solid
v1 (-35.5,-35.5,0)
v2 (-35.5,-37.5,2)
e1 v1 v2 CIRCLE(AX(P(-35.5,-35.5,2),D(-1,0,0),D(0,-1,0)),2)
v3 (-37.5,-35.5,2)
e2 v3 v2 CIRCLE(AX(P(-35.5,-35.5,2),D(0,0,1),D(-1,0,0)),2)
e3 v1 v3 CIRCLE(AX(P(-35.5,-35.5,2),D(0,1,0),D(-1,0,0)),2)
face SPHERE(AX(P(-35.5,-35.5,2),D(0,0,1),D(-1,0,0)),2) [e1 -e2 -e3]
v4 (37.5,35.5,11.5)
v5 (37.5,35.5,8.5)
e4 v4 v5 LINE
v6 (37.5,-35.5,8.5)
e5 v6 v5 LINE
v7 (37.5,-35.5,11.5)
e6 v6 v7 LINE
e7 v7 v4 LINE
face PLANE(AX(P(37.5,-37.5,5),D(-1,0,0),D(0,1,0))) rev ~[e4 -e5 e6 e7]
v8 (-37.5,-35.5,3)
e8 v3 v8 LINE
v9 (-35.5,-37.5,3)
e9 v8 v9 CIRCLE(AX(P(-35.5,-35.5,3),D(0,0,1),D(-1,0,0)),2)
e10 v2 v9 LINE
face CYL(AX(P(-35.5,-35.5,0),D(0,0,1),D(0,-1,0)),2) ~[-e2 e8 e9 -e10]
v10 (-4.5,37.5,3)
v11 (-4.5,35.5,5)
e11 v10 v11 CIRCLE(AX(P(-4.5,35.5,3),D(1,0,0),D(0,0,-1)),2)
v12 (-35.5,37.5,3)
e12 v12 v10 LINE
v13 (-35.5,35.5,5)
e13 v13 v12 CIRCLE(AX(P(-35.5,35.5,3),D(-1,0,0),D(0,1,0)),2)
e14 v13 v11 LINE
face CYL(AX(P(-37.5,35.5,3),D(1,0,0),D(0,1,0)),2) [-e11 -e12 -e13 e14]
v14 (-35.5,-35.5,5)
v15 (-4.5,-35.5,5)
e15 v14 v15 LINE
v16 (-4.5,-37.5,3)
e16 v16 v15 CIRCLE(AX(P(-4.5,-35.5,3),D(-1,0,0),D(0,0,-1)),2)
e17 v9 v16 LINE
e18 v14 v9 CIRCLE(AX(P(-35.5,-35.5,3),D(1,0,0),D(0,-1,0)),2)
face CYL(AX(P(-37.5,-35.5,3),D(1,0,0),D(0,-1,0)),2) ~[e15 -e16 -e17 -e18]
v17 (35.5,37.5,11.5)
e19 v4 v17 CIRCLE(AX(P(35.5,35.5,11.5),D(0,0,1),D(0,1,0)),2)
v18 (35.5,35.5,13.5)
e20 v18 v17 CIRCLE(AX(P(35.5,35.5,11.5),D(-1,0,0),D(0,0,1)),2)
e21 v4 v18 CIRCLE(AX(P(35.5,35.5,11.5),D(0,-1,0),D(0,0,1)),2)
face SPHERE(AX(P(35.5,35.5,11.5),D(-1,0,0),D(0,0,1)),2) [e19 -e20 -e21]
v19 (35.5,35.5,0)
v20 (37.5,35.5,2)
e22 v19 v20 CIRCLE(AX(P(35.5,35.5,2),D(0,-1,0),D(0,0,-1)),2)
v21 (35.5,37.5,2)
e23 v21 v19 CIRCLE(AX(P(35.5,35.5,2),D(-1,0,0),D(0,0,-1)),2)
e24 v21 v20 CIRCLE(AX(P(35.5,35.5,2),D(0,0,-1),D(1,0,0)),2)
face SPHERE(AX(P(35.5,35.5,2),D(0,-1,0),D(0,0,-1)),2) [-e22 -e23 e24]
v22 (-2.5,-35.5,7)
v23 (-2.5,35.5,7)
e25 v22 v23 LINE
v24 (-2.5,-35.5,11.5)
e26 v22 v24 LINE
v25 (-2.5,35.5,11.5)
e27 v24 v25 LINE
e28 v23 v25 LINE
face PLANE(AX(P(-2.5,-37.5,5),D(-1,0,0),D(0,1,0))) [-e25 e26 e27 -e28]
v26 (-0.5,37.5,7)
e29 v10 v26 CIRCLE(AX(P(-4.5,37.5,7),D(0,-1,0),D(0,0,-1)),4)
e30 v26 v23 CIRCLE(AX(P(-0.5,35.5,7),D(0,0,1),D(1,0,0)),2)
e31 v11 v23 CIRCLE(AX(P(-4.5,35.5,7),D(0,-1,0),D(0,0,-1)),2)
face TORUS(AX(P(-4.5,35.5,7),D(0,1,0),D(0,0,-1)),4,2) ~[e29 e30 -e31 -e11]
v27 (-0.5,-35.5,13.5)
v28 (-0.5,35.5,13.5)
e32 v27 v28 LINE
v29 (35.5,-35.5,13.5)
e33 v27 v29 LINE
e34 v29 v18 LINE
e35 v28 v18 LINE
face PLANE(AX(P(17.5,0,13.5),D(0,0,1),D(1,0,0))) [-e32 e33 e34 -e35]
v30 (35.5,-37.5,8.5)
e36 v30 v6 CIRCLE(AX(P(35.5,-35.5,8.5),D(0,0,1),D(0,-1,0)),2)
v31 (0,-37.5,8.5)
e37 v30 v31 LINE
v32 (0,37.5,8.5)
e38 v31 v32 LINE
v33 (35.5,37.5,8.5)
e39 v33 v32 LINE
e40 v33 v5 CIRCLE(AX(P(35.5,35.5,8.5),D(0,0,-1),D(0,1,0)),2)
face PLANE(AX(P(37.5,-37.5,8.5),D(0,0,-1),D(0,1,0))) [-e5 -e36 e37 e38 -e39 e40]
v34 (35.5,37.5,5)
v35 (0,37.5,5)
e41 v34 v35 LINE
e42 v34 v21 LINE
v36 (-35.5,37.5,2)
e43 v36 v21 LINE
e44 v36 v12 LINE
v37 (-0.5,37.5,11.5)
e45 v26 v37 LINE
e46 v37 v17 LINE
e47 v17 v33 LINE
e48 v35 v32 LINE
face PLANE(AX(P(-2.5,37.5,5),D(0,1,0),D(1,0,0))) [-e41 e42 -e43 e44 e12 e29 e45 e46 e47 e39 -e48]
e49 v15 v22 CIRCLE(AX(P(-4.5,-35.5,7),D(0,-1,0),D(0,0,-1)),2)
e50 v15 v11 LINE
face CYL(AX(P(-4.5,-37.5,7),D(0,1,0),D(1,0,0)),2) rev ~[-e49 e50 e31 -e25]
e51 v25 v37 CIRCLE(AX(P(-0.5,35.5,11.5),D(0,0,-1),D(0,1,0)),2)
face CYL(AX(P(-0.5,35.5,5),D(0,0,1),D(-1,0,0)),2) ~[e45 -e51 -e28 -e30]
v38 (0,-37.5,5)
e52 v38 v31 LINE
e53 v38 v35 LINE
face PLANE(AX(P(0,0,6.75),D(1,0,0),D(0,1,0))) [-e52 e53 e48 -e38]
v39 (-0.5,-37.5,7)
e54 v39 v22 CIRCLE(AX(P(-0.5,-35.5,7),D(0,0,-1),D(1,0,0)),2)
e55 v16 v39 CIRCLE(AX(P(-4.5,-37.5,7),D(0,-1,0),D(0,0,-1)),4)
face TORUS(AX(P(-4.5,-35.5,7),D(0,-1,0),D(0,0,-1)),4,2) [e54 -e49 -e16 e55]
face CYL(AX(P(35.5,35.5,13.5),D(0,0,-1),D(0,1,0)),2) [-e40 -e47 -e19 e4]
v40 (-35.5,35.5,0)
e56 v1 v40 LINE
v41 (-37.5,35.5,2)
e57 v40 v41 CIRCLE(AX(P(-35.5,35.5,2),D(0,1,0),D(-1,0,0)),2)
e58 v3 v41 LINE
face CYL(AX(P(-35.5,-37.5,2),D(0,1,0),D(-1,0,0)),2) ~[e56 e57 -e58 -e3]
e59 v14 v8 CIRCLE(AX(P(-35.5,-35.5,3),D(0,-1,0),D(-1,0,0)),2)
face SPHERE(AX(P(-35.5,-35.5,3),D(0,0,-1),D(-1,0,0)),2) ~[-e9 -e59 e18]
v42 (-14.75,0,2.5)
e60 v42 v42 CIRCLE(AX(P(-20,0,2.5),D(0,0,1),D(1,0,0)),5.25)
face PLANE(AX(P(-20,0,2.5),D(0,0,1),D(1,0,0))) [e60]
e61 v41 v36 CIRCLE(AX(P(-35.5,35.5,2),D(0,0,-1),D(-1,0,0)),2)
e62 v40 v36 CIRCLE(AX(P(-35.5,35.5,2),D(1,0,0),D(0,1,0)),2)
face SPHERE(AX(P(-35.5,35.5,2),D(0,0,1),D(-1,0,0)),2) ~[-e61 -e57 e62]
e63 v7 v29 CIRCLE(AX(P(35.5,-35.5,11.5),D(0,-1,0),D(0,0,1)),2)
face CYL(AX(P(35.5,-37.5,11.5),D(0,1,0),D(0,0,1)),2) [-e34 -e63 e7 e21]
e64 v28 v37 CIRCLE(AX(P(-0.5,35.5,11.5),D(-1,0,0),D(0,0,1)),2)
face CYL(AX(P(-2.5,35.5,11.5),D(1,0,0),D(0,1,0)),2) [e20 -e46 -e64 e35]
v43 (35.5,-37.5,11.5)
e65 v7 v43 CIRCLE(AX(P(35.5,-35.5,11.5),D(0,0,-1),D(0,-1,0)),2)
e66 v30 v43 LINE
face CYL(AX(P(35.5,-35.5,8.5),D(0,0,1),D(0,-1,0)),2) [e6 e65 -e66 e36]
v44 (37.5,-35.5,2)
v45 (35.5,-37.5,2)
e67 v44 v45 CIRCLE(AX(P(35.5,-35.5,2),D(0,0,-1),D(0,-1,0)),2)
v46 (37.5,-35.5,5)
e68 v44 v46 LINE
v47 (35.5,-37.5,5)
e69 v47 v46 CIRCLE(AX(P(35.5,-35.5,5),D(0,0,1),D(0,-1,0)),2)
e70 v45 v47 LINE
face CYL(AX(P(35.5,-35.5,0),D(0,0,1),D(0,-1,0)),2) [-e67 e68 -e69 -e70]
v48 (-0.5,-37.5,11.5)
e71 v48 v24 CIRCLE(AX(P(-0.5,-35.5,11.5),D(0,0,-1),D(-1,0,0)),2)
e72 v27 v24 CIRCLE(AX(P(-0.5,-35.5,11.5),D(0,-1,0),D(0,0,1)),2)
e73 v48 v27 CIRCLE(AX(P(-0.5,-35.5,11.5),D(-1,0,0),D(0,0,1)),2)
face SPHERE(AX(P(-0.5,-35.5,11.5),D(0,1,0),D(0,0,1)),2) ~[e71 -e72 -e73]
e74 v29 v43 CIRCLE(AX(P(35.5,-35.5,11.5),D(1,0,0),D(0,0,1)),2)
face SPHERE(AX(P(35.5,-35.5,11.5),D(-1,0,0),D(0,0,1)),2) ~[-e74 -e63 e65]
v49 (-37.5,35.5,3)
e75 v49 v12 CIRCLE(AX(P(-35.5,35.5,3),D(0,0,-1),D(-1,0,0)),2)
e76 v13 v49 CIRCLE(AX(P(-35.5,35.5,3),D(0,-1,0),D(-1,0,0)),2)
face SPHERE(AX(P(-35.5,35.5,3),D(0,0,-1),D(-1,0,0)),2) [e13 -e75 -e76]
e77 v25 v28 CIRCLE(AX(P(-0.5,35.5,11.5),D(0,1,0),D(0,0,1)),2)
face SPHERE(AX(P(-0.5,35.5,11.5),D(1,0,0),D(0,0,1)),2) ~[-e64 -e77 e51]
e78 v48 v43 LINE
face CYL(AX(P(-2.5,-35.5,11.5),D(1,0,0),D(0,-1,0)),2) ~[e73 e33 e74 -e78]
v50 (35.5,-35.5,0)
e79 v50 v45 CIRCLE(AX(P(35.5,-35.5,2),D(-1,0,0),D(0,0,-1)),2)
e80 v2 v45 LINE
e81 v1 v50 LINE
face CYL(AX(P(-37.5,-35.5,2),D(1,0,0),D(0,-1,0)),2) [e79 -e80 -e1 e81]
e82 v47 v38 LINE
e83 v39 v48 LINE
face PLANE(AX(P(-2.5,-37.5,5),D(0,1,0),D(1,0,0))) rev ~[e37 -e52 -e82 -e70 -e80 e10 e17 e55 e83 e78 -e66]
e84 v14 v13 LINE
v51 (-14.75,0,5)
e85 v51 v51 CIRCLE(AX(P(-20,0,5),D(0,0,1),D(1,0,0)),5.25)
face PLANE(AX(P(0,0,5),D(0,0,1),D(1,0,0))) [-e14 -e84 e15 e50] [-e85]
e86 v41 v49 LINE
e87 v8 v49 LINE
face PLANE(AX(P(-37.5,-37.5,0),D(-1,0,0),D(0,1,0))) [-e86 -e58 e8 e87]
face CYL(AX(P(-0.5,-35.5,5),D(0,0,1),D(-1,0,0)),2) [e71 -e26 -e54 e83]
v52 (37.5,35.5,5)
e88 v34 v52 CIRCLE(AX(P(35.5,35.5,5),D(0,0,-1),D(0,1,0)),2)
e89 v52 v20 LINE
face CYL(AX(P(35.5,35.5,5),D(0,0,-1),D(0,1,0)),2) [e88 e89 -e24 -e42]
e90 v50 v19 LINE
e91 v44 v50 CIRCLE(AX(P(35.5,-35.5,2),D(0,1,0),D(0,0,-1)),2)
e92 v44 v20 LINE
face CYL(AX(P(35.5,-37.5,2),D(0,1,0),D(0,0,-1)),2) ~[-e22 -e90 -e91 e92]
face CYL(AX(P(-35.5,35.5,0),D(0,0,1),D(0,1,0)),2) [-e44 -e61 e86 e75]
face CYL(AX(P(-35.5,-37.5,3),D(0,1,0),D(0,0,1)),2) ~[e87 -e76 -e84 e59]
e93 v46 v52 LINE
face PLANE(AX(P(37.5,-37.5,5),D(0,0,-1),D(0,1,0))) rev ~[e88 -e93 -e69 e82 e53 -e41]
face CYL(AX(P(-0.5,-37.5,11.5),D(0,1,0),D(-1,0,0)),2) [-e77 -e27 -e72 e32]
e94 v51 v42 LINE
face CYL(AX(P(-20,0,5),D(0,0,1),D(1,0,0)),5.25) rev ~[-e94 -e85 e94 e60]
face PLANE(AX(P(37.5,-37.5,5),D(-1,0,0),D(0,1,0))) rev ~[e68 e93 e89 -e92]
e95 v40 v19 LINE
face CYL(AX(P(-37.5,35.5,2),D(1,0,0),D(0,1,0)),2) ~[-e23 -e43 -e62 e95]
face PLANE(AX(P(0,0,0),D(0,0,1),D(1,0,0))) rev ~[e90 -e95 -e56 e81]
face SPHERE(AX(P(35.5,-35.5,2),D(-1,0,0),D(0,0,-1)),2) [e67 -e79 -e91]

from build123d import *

# Parameters (mm, degrees)
F0_W     = 75
F0_H     = 75
F1_DEPTH = 5
F2_W     = 40
F2_H     = 75
F3_DEPTH = 8.5
F4_W     = 75
F4_H     = 3.5
F5_DEPTH = 37.5
F6_R     = 5.25
F7_DEPTH = 2.5
F8_R     = 2


with BuildPart() as f1:
    # F0 (on Top) → F1 (new body)
    with BuildSketch(Plane.XY):
        Rectangle(F0_W, F0_H)
    extrude(amount=F1_DEPTH)

    # F2 (on face) → F3 (join)
    with BuildSketch(Plane.XY.offset(5)):
        with Locations((17.5, 0)):
            Rectangle(F2_W, F2_H)
    extrude(amount=F3_DEPTH)

    # F4 (on face) → F5 (cut, through all)
    with BuildSketch(Plane.YZ.offset(37.5)):
        with Locations((0, 6.75)):
            Rectangle(F4_W, F4_H)
    extrude(amount=-F5_DEPTH, mode=Mode.SUBTRACT)

    # F6 (on face) → F7 (cut)
    with BuildSketch(Plane.XY.offset(5)):
        with Locations((-20, 0)):
            Circle(F6_R)
    extrude(amount=-F7_DEPTH, mode=Mode.SUBTRACT)

    # F8
    f8_edges = [f1.edges().sort_by_distance(p)[0] for p in [
        (17.5, 37.5, 13.5),
        (-2.5, 0, 13.5),
        (17.5, -37.5, 13.5),
        (37.5, 0, 13.5),
        (-2.5, 37.5, 9.25),
        (-2.5, -37.5, 9.25),
        (-2.5, 0, 5),
        (-37.5, 37.5, 2.5),
        (-37.5, -37.5, 2.5),
        (-37.5, 0, 0),
        (-37.5, 0, 5),
        (0, -37.5, 0),
        (37.5, 0, 0),
        (0, 37.5, 0),
        (37.5, -37.5, 11),
        (37.5, -37.5, 2.5),
        (37.5, 37.5, 11),
        (37.5, 37.5, 2.5),
        (-20, -37.5, 5),
        (-20, 37.5, 5),
    ]]
    fillet(f8_edges, radius=F8_R)


solid = f1.part
